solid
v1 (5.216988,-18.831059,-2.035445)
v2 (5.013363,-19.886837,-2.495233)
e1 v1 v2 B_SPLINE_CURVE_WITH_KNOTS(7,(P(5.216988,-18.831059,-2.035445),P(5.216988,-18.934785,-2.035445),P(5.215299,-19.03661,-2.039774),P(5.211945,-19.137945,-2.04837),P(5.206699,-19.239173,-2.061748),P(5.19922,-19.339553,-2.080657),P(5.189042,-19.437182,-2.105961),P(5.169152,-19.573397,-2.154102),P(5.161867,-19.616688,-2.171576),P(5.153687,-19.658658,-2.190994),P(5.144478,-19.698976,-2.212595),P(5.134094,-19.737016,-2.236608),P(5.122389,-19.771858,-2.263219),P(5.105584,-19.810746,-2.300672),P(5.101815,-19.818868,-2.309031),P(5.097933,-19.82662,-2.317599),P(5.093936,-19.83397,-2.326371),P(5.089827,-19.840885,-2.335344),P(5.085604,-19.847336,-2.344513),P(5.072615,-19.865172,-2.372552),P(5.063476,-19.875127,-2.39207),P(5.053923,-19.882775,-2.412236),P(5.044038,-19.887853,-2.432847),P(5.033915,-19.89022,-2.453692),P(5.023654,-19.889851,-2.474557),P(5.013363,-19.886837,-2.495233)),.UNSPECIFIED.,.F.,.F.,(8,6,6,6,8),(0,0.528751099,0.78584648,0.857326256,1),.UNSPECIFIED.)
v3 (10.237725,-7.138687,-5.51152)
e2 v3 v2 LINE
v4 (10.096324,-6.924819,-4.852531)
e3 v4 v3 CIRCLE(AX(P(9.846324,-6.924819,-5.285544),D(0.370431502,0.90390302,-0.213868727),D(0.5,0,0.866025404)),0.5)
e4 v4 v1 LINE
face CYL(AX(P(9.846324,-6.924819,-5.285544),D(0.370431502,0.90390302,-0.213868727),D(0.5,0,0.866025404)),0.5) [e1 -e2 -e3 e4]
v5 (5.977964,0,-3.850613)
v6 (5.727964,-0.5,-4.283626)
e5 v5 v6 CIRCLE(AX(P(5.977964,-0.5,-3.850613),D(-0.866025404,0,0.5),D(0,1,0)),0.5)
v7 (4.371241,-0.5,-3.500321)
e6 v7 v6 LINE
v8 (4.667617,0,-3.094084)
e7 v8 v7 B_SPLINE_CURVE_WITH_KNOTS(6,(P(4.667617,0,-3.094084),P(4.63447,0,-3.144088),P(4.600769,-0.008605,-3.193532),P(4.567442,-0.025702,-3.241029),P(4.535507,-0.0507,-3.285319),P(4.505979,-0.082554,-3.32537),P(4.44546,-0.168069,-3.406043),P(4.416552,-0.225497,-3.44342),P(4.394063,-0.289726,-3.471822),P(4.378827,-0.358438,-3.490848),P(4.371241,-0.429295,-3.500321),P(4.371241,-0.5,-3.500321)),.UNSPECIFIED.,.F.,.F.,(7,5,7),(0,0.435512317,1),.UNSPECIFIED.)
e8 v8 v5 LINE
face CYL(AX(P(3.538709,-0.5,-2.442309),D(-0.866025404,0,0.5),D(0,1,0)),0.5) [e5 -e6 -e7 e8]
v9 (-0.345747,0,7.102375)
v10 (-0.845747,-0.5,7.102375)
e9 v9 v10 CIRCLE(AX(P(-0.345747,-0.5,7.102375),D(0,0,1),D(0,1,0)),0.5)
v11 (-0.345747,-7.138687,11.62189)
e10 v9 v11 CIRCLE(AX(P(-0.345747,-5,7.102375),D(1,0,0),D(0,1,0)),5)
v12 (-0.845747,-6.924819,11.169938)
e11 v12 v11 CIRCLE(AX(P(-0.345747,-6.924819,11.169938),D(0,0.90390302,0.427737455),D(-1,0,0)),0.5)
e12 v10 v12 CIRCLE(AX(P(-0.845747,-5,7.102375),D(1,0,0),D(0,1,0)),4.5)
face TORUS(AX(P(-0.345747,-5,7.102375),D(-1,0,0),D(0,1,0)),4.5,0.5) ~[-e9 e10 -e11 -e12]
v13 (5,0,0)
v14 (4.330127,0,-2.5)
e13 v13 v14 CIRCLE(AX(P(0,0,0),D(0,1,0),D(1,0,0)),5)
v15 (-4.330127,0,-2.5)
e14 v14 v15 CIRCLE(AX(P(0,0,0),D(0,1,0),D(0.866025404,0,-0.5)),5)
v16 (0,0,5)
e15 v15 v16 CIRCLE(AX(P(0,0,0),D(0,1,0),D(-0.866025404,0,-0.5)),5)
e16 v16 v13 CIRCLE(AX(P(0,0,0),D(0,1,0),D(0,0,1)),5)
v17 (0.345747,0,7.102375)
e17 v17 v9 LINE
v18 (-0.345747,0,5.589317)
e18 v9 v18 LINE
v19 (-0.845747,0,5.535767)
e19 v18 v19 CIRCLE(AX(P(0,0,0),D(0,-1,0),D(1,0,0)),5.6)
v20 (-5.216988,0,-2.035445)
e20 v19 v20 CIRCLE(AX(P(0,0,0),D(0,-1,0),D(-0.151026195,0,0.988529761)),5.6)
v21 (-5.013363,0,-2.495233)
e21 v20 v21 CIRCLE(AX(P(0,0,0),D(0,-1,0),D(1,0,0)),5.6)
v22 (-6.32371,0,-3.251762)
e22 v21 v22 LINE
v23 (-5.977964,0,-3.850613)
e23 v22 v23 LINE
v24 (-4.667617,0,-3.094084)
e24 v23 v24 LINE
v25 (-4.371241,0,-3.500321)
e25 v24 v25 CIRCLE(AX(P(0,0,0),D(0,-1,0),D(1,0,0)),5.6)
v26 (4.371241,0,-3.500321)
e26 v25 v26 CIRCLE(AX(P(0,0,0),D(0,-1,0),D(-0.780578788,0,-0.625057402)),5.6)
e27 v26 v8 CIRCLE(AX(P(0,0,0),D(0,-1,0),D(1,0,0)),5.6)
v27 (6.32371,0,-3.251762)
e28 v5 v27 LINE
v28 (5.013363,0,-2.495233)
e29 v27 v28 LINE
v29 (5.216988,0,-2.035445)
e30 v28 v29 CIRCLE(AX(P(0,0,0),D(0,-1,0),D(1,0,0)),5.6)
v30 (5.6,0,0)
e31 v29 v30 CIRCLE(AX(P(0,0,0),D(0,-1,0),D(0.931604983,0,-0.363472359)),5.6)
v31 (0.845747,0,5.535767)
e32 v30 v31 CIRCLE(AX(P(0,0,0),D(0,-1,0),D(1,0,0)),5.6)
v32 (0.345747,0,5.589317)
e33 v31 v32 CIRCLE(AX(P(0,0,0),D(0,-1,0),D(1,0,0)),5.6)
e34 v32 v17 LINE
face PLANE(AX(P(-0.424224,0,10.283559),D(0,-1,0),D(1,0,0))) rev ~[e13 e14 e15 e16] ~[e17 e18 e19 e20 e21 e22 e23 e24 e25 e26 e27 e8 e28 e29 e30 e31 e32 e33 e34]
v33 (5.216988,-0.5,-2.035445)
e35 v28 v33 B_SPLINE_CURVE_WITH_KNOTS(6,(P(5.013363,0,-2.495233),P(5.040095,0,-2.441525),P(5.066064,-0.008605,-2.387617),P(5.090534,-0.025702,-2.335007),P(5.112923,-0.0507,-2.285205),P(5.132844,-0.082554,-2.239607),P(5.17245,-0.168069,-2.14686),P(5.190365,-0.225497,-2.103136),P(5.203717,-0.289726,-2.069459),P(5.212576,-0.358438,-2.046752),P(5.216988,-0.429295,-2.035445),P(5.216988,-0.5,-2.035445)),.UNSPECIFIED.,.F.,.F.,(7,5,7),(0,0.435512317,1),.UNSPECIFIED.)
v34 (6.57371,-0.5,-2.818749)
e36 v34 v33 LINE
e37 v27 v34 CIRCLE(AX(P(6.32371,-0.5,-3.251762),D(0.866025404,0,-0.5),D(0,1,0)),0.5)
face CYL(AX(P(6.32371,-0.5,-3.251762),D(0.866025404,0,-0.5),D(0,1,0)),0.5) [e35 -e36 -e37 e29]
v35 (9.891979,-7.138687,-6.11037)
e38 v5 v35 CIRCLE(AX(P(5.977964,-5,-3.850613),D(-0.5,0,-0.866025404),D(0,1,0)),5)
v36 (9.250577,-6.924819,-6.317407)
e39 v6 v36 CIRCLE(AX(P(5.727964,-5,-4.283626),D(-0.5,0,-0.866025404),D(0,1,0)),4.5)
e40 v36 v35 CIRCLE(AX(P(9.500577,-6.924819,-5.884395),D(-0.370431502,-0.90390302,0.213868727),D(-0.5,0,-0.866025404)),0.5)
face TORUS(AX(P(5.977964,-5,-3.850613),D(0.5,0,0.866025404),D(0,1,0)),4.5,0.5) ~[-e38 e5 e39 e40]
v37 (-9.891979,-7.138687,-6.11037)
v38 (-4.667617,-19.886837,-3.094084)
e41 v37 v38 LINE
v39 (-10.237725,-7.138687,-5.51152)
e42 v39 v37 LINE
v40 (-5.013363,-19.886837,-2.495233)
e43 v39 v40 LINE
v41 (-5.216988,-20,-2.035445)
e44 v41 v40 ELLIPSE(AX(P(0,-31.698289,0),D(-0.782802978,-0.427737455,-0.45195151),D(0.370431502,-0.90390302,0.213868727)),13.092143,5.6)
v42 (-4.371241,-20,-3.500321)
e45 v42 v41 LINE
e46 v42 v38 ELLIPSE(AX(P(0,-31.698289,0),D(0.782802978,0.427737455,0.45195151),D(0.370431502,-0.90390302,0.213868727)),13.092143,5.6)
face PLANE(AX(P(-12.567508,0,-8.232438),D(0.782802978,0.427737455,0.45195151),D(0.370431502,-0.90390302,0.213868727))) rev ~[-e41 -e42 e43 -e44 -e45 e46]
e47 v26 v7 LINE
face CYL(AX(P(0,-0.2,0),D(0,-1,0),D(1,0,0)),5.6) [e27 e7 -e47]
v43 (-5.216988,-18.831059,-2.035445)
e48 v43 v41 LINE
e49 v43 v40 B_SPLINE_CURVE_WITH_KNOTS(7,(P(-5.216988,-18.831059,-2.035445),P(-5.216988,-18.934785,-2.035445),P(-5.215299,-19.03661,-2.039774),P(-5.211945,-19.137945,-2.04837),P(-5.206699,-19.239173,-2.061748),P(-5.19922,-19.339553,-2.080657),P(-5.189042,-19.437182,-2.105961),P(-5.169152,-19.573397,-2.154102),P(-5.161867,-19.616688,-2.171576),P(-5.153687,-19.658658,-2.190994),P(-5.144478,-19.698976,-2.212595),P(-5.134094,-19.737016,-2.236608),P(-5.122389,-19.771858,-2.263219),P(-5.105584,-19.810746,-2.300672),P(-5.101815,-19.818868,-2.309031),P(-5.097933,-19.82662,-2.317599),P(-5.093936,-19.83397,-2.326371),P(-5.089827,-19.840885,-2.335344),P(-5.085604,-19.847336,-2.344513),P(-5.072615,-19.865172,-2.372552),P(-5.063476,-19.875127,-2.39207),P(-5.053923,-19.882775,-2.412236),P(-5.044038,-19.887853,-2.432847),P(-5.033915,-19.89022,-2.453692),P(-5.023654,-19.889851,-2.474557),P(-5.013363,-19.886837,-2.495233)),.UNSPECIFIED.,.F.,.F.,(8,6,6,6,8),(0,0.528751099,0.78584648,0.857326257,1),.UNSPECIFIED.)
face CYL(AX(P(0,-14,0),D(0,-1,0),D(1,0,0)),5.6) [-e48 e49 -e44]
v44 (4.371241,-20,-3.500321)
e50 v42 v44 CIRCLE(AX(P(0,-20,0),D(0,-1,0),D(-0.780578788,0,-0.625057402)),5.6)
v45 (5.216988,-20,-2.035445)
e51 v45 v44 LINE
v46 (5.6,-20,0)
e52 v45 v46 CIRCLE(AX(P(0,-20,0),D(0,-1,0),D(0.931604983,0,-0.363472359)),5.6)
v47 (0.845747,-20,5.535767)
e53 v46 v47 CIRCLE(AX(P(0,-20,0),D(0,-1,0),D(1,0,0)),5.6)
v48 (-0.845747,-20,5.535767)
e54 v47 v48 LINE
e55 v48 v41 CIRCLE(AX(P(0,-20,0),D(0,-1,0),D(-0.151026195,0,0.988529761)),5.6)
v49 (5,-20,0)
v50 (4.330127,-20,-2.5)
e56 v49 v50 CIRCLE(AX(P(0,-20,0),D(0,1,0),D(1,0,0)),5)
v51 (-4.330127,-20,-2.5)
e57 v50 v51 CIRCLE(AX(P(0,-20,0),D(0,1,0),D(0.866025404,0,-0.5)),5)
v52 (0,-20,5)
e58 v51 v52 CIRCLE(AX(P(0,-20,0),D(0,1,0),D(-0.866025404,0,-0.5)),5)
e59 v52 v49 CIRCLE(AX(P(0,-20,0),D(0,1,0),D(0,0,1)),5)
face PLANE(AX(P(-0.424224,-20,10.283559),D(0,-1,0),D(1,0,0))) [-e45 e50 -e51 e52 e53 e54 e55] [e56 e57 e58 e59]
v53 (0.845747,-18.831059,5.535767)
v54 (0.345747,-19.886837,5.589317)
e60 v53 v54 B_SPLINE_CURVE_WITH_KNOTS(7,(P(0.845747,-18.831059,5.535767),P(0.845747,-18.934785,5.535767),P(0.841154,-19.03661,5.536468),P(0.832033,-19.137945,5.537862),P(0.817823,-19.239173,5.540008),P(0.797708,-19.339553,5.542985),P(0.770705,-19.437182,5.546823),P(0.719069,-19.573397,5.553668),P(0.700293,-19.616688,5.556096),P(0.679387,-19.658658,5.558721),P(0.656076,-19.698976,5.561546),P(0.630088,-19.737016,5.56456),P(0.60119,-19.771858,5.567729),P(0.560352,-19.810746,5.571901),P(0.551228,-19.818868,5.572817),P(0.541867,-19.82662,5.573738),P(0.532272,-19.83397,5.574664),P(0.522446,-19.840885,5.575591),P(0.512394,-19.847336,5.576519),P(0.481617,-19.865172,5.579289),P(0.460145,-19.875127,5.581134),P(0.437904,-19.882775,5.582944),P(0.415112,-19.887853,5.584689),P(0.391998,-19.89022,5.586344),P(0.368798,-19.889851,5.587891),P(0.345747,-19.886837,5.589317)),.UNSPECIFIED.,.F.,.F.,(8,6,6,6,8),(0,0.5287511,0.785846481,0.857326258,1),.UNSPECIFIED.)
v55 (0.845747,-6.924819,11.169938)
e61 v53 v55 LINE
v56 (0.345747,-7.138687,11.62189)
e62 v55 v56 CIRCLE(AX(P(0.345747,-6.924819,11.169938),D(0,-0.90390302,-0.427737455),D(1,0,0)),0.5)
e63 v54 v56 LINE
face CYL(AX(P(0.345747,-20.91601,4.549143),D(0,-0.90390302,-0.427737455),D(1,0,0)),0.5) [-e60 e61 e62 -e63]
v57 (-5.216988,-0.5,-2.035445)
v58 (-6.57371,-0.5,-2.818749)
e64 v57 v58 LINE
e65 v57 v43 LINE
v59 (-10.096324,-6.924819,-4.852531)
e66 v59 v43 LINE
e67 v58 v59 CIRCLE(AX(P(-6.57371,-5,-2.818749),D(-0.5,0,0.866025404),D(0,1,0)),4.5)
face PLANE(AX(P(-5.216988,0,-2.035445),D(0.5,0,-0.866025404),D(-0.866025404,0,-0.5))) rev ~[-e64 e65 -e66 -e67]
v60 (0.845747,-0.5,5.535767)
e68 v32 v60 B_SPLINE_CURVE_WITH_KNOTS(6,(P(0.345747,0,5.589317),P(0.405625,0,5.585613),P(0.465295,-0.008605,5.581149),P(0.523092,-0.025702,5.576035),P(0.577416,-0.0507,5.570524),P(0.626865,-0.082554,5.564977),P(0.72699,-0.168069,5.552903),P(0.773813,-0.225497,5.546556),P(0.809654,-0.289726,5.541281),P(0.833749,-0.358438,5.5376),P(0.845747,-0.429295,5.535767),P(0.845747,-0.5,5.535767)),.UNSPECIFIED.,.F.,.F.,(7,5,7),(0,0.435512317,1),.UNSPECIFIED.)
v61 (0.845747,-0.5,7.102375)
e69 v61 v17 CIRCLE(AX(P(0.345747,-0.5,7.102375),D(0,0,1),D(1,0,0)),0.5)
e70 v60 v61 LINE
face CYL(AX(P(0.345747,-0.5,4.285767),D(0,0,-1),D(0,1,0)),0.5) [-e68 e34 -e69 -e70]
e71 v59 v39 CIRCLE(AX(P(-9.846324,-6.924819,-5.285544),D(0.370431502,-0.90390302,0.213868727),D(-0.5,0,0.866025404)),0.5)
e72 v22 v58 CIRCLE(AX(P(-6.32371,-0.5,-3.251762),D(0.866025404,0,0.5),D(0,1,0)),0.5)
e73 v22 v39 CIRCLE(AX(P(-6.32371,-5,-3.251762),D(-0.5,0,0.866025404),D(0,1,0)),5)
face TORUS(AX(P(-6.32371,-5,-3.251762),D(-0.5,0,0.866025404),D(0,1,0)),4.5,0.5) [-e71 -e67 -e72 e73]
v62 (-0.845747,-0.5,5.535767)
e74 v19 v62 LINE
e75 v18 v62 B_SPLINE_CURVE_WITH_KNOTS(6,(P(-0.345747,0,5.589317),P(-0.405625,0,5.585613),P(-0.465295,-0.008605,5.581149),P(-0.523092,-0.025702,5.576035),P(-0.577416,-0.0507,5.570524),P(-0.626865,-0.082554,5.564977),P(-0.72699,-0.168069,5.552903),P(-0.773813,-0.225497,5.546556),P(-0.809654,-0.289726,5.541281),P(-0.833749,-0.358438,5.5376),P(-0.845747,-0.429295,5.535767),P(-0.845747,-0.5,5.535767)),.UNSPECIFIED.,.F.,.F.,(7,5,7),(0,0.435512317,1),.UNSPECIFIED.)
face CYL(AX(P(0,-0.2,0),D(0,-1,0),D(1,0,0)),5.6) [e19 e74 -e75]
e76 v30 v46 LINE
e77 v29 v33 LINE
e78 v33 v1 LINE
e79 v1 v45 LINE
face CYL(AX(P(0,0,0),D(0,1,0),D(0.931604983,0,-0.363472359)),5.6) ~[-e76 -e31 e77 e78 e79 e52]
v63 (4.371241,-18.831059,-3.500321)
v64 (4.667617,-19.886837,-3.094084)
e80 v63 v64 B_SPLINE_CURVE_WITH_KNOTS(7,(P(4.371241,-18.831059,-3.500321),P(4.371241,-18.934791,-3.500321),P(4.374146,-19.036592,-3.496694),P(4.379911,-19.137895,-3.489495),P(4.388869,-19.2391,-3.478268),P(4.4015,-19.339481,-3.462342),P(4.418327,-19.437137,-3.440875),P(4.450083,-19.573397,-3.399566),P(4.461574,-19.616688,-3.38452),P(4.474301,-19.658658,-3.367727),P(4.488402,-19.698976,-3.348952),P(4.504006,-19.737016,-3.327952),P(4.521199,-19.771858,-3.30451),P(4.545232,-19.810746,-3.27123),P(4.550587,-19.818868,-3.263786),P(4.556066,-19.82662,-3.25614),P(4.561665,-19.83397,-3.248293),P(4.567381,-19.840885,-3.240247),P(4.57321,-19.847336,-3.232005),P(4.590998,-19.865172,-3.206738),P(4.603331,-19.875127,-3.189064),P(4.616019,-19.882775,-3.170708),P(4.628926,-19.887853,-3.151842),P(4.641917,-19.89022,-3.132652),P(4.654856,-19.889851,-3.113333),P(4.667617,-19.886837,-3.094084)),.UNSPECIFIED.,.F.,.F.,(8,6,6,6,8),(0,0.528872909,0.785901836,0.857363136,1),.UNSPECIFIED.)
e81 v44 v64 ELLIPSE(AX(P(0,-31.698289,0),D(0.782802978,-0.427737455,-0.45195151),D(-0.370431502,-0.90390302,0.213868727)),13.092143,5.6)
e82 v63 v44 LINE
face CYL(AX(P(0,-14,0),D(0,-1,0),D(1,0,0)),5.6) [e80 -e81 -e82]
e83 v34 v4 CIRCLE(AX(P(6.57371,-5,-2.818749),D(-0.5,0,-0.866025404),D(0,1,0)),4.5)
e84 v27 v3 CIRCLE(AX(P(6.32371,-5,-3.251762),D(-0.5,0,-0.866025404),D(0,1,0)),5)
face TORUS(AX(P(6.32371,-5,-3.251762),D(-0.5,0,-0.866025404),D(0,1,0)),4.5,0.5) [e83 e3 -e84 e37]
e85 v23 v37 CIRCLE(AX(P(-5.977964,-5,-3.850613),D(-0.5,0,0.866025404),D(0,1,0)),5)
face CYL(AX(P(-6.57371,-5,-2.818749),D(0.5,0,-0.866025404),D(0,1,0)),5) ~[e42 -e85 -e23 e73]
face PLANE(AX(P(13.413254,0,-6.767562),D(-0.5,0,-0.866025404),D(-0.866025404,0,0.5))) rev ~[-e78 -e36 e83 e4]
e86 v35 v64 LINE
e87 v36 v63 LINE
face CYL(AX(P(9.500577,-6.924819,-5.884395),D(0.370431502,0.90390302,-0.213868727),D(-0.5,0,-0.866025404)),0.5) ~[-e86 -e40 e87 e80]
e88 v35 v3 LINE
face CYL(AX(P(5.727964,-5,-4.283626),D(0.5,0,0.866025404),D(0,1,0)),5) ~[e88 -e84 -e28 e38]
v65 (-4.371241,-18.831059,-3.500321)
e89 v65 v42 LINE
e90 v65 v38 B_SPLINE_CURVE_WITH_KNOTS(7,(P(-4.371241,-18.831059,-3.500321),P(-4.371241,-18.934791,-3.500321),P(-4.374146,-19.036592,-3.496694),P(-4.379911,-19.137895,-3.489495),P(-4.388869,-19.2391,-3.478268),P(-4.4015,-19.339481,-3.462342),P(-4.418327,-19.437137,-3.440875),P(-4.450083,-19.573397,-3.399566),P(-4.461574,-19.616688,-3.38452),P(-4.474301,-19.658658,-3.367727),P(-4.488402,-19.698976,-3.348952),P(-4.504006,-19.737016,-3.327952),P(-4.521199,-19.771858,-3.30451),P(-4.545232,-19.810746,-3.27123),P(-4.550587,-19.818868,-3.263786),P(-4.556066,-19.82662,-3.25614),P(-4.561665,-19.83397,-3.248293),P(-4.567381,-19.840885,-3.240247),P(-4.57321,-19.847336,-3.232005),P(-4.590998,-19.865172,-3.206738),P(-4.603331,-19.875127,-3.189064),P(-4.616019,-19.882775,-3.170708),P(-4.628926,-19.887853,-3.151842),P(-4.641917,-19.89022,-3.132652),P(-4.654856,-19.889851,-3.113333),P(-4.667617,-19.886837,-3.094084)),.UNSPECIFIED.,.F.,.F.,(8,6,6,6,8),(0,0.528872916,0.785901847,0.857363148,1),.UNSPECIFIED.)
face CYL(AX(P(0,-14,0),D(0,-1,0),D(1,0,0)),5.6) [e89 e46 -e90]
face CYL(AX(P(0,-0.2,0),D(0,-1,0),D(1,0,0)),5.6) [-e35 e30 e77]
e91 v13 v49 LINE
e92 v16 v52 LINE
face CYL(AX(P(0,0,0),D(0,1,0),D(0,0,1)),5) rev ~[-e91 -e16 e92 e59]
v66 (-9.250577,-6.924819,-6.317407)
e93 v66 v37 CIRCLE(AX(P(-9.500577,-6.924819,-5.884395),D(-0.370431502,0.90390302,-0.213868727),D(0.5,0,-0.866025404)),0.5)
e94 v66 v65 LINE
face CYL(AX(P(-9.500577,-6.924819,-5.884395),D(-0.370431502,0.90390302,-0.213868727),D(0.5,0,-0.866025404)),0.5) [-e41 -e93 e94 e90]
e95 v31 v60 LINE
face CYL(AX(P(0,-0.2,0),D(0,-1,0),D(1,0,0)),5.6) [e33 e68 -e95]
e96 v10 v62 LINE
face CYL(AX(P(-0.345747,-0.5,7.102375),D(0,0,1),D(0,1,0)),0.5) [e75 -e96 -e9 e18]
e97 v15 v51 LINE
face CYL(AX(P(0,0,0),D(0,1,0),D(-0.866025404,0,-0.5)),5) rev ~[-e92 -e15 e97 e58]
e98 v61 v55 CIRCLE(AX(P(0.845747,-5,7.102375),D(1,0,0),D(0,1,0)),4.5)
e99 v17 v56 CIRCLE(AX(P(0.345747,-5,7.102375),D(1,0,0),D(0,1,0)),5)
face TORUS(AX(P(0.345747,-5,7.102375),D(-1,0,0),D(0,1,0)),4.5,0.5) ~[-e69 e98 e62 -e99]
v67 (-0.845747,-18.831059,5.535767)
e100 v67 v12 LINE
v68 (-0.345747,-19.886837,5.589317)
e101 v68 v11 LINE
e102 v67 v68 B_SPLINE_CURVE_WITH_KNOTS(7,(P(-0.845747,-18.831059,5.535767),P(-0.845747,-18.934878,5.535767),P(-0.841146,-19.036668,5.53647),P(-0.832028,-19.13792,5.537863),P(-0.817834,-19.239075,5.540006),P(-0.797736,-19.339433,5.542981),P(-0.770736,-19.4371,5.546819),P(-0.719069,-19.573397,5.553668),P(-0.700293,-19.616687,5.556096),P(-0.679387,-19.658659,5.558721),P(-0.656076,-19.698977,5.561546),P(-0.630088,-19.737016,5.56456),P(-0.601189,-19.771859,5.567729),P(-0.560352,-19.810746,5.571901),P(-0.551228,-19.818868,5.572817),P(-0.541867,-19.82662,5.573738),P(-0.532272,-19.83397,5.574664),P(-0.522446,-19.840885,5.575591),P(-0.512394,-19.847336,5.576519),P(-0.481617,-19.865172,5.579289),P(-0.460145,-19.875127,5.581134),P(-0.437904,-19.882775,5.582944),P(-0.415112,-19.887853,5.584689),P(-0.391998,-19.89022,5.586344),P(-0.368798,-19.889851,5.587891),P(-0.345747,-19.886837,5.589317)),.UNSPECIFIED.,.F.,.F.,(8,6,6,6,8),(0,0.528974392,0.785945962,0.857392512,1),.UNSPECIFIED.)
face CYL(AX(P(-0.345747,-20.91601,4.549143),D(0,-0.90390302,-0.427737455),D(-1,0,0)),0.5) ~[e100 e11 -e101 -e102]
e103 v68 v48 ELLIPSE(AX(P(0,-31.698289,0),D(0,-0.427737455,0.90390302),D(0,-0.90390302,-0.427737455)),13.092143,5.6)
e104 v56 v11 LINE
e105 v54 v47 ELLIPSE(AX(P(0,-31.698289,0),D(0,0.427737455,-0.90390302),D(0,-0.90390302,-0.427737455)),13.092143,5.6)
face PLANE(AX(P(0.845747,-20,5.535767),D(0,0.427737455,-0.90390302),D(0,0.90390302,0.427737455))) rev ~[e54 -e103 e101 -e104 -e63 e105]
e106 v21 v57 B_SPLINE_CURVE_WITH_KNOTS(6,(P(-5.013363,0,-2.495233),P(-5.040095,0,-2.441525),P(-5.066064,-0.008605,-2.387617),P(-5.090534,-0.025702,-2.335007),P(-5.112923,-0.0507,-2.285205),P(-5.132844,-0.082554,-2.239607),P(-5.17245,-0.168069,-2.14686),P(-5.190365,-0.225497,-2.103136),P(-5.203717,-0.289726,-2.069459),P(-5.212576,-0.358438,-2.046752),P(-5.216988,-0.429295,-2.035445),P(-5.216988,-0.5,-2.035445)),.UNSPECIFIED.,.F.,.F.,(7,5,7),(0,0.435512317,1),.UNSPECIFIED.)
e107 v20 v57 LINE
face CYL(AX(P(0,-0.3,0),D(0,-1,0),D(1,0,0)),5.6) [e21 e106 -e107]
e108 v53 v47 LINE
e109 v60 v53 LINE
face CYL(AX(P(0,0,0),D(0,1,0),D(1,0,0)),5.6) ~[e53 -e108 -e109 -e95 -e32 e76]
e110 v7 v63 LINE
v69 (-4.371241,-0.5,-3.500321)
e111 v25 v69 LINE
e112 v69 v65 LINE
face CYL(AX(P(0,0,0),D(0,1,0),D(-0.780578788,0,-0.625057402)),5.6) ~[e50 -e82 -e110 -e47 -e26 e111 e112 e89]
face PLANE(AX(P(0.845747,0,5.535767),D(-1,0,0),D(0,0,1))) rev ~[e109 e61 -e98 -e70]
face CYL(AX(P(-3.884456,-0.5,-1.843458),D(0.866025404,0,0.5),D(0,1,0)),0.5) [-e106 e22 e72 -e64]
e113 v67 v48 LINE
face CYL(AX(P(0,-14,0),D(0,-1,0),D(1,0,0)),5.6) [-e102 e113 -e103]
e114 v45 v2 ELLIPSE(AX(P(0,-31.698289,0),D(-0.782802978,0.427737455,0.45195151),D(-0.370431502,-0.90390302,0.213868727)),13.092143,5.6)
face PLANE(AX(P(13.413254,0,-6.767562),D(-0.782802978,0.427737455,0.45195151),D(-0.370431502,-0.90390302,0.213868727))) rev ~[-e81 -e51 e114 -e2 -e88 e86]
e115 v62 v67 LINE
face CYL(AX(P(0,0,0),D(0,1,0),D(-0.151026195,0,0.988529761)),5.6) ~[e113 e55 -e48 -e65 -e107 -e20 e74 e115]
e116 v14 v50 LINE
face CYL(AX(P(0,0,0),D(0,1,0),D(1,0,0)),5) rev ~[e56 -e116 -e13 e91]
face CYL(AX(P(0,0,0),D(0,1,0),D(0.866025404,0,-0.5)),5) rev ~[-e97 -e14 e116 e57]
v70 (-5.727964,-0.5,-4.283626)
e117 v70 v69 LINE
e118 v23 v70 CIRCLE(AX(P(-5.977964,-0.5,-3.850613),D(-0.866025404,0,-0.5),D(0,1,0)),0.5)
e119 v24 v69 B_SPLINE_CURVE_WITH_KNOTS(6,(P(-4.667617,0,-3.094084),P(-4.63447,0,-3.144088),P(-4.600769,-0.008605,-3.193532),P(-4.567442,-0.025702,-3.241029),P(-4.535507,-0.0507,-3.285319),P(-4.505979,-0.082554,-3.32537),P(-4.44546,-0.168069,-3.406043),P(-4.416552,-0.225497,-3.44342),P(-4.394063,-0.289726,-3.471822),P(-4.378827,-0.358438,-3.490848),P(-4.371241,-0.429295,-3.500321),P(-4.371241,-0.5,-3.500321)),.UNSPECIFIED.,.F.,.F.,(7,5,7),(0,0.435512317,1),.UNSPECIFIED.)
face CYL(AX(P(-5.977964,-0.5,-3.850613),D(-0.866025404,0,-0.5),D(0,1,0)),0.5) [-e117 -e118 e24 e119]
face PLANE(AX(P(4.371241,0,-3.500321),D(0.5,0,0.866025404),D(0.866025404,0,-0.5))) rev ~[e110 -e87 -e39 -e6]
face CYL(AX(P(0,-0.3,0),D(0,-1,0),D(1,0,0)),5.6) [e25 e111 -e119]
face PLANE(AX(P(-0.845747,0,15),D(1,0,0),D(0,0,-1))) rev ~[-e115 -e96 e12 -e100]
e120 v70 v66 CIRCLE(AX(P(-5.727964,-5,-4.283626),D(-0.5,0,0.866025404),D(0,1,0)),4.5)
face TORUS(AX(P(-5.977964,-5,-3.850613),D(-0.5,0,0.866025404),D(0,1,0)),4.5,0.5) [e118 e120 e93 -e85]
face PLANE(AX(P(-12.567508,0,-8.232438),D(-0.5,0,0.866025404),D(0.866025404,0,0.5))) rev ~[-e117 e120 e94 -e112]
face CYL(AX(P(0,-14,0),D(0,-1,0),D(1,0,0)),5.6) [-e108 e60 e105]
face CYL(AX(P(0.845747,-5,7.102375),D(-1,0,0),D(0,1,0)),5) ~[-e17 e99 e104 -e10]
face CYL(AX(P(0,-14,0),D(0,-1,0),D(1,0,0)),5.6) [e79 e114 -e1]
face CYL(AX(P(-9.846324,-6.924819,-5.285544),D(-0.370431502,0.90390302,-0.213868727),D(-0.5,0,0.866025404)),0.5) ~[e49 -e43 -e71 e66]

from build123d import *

# Parameters (mm, degrees)
F1_DEPTH      = 20
F2_DEPTH      = 20
F4_DEPTH      = 14.8
F5_R          = 5
F6_DEPTH      = 20
F8_DEPTH      = 25
F10_DEPTH     = 25
F11_R         = 5
F12_T4_DEPTH  = 15.4786422769
F12_S5_R      = 5.6
F12_T6_DEPTH  = 9
F12_T10_DEPTH = 15.4786422769
F12_S11_R     = 5.6
F12_T12_DEPTH = 9
F12_T14_ANGLE = 115.3240588084
F12_T16_ANGLE = 115.3240588084
F12_T20_DEPTH = 2.8166081333
F12_S21_R     = 5.6
F12_T22_DEPTH = 3
F12_T26_DEPTH = 2.8166081333
F12_S27_R     = 5.6
F12_T28_DEPTH = 3
F13_T4_DEPTH  = 15.4786422769
F13_S5_R      = 5.6
F13_T6_DEPTH  = 9
F13_T10_DEPTH = 15.4786422769
F13_S11_R     = 5.6
F13_T12_DEPTH = 10
F13_T16_DEPTH = 15.4786422769
F13_S17_R     = 5.6
F13_T18_DEPTH = 10
F13_T22_DEPTH = 15.4786422769
F13_S23_R     = 5.6
F13_T24_DEPTH = 9
F13_T28_DEPTH = 2.8166081333
F13_S29_R     = 5.6
F13_T30_DEPTH = 3
F13_T34_DEPTH = 2.8166081333
F13_S35_R     = 5.6
F13_T36_DEPTH = 3
F13_T40_DEPTH = 2.8166081333
F13_S41_R     = 5.6
F13_T42_DEPTH = 3
F13_T46_DEPTH = 2.8166081333
F13_S47_R     = 5.6
F13_T48_DEPTH = 3
F13_T50_ANGLE = 115.3240588084
F13_T52_ANGLE = 115.3240588084
F13_T54_ANGLE = 115.3240588084
F13_T56_ANGLE = 115.3240588084


# Not quite as in the source:
# - a fillet or chamfer that OpenCascade refuses, or shapes differently, is made with other operations: its cross-section is extruded or revolved along the edge and cut away or added


with BuildPart() as f1:
    # F0 (on Front) → F1 (new body)
    with BuildSketch(Plane.XZ):
        with BuildLine():
            ThreePointArc((-4.3301270189, -2.5), (-4.3301270189, 2.5), (0, 5))
            Line((0, 5), (-0.8457466924, 5))
            Line((-0.8457466924, 5), (-0.8457466924, 5.5357666617))
            ThreePointArc((-0.8457466924, 5.5357666617), (-4.8497422612, 2.8), (-5.2169879046, -2.03544521))
            Line((-5.2169879046, -2.03544521), (-4.7530003651, -1.7675618792))
            Line((-4.7530003651, -1.7675618792), (-4.3301270189, -2.5))
        make_face()
        with BuildLine():
            Line((3.9072536727, -3.2324381208), (4.3301270189, -2.5))
            ThreePointArc((4.3301270189, -2.5), (0, -5), (-4.3301270189, -2.5))
            Line((-4.3301270189, -2.5), (-3.9072536727, -3.2324381208))
            Line((-3.9072536727, -3.2324381208), (-4.3712412122, -3.5003214516))
            ThreePointArc((-4.3712412122, -3.5003214516), (0, -5.6), (4.3712412122, -3.5003214516))
            Line((4.3712412122, -3.5003214516), (3.9072536727, -3.2324381208))
        make_face()
        with BuildLine():
            Line((-3.9072536727, -3.2324381208), (-4.3301270189, -2.5))
            Line((-4.3301270189, -2.5), (-4.8497422612, -2.8))
            ThreePointArc((-4.8497422612, -2.8), (-4.6237697378, -3.1592330417), (-4.3712412122, -3.5003214516))
            Line((-4.3712412122, -3.5003214516), (-3.9072536727, -3.2324381208))
        make_face()
        with BuildLine():
            Line((-4.8497422612, -2.8), (-4.3301270189, -2.5))
            Line((-4.3301270189, -2.5), (-4.7530003651, -1.7675618792))
            Line((-4.7530003651, -1.7675618792), (-5.2169879046, -2.03544521))
            ThreePointArc((-5.2169879046, -2.03544521), (-5.0478609395, -2.4246855333), (-4.8497422612, -2.8))
        make_face()
        with BuildLine():
            Line((4.8497422612, -2.8), (4.3301270189, -2.5))
            Line((4.3301270189, -2.5), (3.9072536727, -3.2324381208))
            Line((3.9072536727, -3.2324381208), (4.3712412122, -3.5003214516))
            ThreePointArc((4.3712412122, -3.5003214516), (4.6237697378, -3.1592330417), (4.8497422612, -2.8))
        make_face()
        with BuildLine():
            Line((4.7530003651, -1.7675618792), (4.3301270189, -2.5))
            Line((4.3301270189, -2.5), (4.8497422612, -2.8))
            ThreePointArc((4.8497422612, -2.8), (5.0478609395, -2.4246855333), (5.2169879046, -2.03544521))
            Line((5.2169879046, -2.03544521), (4.7530003651, -1.7675618792))
        make_face()
        with BuildLine():
            ThreePointArc((0, 5), (3.5355339059, 3.5355339059), (5, 0))
            ThreePointArc((5, 0), (4.8296291314, -1.2940952255), (4.3301270189, -2.5))
            Line((4.3301270189, -2.5), (4.7530003651, -1.7675618792))
            Line((4.7530003651, -1.7675618792), (5.2169879046, -2.03544521))
            ThreePointArc((5.2169879046, -2.03544521), (5.5034140434, -1.0355838291), (5.6, 0))
            ThreePointArc((5.6, 0), (4.2483044546, 3.6485489254), (0.8457466924, 5.5357666617))
            Line((0.8457466924, 5.5357666617), (0.8457466924, 5))
            Line((0.8457466924, 5), (0, 5))
        make_face()
        with BuildLine():
            Line((0, 5.6), (0, 5))
            Line((0, 5), (0.8457466924, 5))
            Line((0.8457466924, 5), (0.8457466924, 5.5357666617))
            ThreePointArc((0.8457466924, 5.5357666617), (0.4240912017, 5.583918575), (0, 5.6))
        make_face()
        with BuildLine():
            Line((-0.8457466924, 5), (0, 5))
            Line((0, 5), (0, 5.6))
            ThreePointArc((0, 5.6), (-0.4240912017, 5.583918575), (-0.8457466924, 5.5357666617))
            Line((-0.8457466924, 5.5357666617), (-0.8457466924, 5))
        make_face()
    extrude(amount=F1_DEPTH)

    # F0 (on Front) → F2 (join)
    with BuildSketch(Plane.XZ):
        with BuildLine():
            ThreePointArc((-4.3712412122, -3.5003214516), (-4.6237697378, -3.1592330417), (-4.8497422612, -2.8))
            Line((-4.8497422612, -2.8), (-12.9903810568, -7.5))
            Line((-12.9903810568, -7.5), (-12.5675077106, -8.2324381208))
            Line((-12.5675077106, -8.2324381208), (-4.3712412122, -3.5003214516))
        make_face()
        with BuildLine():
            Line((-12.9903810568, -7.5), (-4.8497422612, -2.8))
            ThreePointArc((-4.8497422612, -2.8), (-5.0478609395, -2.4246855333), (-5.2169879046, -2.03544521))
            Line((-5.2169879046, -2.03544521), (-13.413254403, -6.7675618792))
            Line((-13.413254403, -6.7675618792), (-12.9903810568, -7.5))
        make_face()
    extrude(amount=F2_DEPTH)

    # F3 (on face) → F4 (cut)
    with BuildSketch(Plane(origin=(0.4228733462, 0, -0.7324381208), x_dir=(0.8660254038, 0, 0.5), z_dir=(0.5, 0, -0.8660254038))):
        Polygon((-15, 0), (-5.5357666617, 20), (-15, 20), align=None)
    extrude(amount=-F4_DEPTH, mode=Mode.SUBTRACT)

    # F5
    f5_edges = [f1.edges().sort_by_distance(p)[0] for p in [
        (-12.990381, 0, -7.5),
    ]]
    fillet(f5_edges, radius=F5_R)

    # F0 (on Front) → F6 (join)
    with BuildSketch(Plane.XZ):
        with BuildLine():
            ThreePointArc((-0.8457466924, 5.5357666617), (-0.4240912017, 5.583918575), (0, 5.6))
            Line((0, 5.6), (0, 15))
            Line((0, 15), (-0.8457466924, 15))
            Line((-0.8457466924, 15), (-0.8457466924, 5.5357666617))
        make_face()
        with BuildLine():
            Line((0, 15), (0, 5.6))
            ThreePointArc((0, 5.6), (0.4240912017, 5.583918575), (0.8457466924, 5.5357666617))
            Line((0.8457466924, 5.5357666617), (0.8457466924, 15))
            Line((0.8457466924, 15), (0, 15))
        make_face()
        with BuildLine():
            ThreePointArc((5.2169879046, -2.03544521), (5.0478609395, -2.4246855333), (4.8497422612, -2.8))
            Line((4.8497422612, -2.8), (12.9903810568, -7.5))
            Line((12.9903810568, -7.5), (13.413254403, -6.7675618792))
            Line((13.413254403, -6.7675618792), (5.2169879046, -2.03544521))
        make_face()
        with BuildLine():
            Line((12.9903810568, -7.5), (4.8497422612, -2.8))
            ThreePointArc((4.8497422612, -2.8), (4.6237697378, -3.1592330417), (4.3712412122, -3.5003214516))
            Line((4.3712412122, -3.5003214516), (12.5675077106, -8.2324381208))
            Line((12.5675077106, -8.2324381208), (12.9903810568, -7.5))
        make_face()
    extrude(amount=F6_DEPTH)

    # F7 (on face) → F8 (cut)
    with BuildSketch(Plane(origin=(0.4228733462, 0, 0.7324381208), x_dir=(0.8660254038, 0, -0.5), z_dir=(0.5, 0, 0.8660254038))):
        Polygon((15, 0), (5.5357666617, -20), (15, -20), align=None)
    extrude(amount=-F8_DEPTH, mode=Mode.SUBTRACT)

    # F9 (on face) → F10 (cut)
    with BuildSketch(Plane.YZ.offset(0.8457466924)):
        Polygon((-20, 15), (-20, 5.5357666617), (0, 15), align=None)
    extrude(amount=-F10_DEPTH, mode=Mode.SUBTRACT)

    # F11
    f11_edges = [f1.edges().sort_by_distance(p)[0] for p in [
        (12.990381, 0, -7.5),
        (0, 0, 15),
    ]]
    fillet(f11_edges, radius=F11_R)

    # F12: fillet of radius 0.5 on 4 edges, made by hand


with BuildPart() as f12_tool2:
    # F12_s3 → F12_t4 (new body)
    with BuildSketch(Plane(origin=(0, -15.3303811163, -7.2545152025), x_dir=(1, 0, 0), z_dir=(0, 0.9039030201, 0.4277374549))):
        with BuildLine():
            ThreePointArc((0.8457466924, -13.0585453012), (0.699300083, -13.4120986918), (0.3457466924, -13.5585453012))
            Line((0.3457466924, -13.5585453012), (0.8457466924, -13.5585453012))
            Line((0.8457466924, -13.5585453012), (0.8457466924, -13.0585453012))
        make_face()
    extrude(amount=F12_T4_DEPTH)

    # F12_s5 → F12_t6 (cut, symmetric)
    with BuildSketch(Plane.XZ.offset(14)):
        Circle(F12_S5_R)
    extrude(amount=F12_T6_DEPTH, both=True, mode=Mode.SUBTRACT)


with BuildPart() as f1_1:
    add(f1.part)

    # F12_t1: cut F12_tool2
    add(f12_tool2.part, mode=Mode.SUBTRACT)


with BuildPart() as f12_tool8:
    # F12_s9 → F12_t10 (new body)
    with BuildSketch(Plane(origin=(0, -15.3303811163, -7.2545152025), x_dir=(1, 0, 0), z_dir=(0, 0.9039030201, 0.4277374549))):
        with BuildLine():
            ThreePointArc((-0.8457466924, -13.0585453012), (-0.699300083, -13.4120986918), (-0.3457466924, -13.5585453012))
            Line((-0.3457466924, -13.5585453012), (-0.8457466924, -13.5585453012))
            Line((-0.8457466924, -13.5585453012), (-0.8457466924, -13.0585453012))
        make_face()
    extrude(amount=F12_T10_DEPTH)

    # F12_s11 → F12_t12 (cut, symmetric)
    with BuildSketch(Plane.XZ.offset(14)):
        Circle(F12_S11_R)
    extrude(amount=F12_T12_DEPTH, both=True, mode=Mode.SUBTRACT)


with BuildPart() as f1_2:
    add(f1_1.part)

    # F12_t7: cut F12_tool8
    add(f12_tool8.part, mode=Mode.SUBTRACT)

    # F12_s13 → F12_t14 (revolve, cut)
    with BuildSketch(Plane.XY.offset(7.1023747949)):
        with BuildLine():
            ThreePointArc((0.8457466924, -0.5), (0.699300083, -0.1464466094), (0.3457466924, 0))
            Line((0.3457466924, 0), (0.8457466924, 0))
            Line((0.8457466924, 0), (0.8457466924, -0.5))
        make_face()
    revolve(axis=Axis((0.8457466924, -5, 7.1023747949), (1, 0, 0)), revolution_arc=F12_T14_ANGLE, mode=Mode.SUBTRACT)

    # F12_s15 → F12_t16 (revolve, cut)
    with BuildSketch(Plane.XY.offset(7.1023747949)):
        with BuildLine():
            ThreePointArc((-0.3457466924, 0), (-0.699300083, -0.1464466094), (-0.8457466924, -0.5))
            Line((-0.8457466924, -0.5), (-0.8457466924, 0))
            Line((-0.8457466924, 0), (-0.3457466924, 0))
        make_face()
    revolve(axis=Axis((-0.8457466924, -5, 7.1023747949), (1, 0, 0)), revolution_arc=F12_T16_ANGLE, mode=Mode.SUBTRACT)


with BuildPart() as f12_tool18:
    # F12_s19 → F12_t20 (new body)
    with BuildSketch(Plane.XY.offset(7.1023747949)):
        with BuildLine():
            ThreePointArc((-0.3457466924, 0), (-0.699300083, -0.1464466094), (-0.8457466924, -0.5))
            Line((-0.8457466924, -0.5), (-0.8457466924, 0))
            Line((-0.8457466924, 0), (-0.3457466924, 0))
        make_face()
    extrude(amount=-F12_T20_DEPTH)

    # F12_s21 → F12_t22 (cut, symmetric)
    with BuildSketch(Plane.XZ.offset(0.2)):
        Circle(F12_S21_R)
    extrude(amount=F12_T22_DEPTH, both=True, mode=Mode.SUBTRACT)


with BuildPart() as f1_3:
    add(f1_2.part)

    # F12_t17: cut F12_tool18
    add(f12_tool18.part, mode=Mode.SUBTRACT)


with BuildPart() as f12_tool24:
    # F12_s25 → F12_t26 (new body)
    with BuildSketch(Plane.XY.offset(4.2857666617)):
        with BuildLine():
            ThreePointArc((0.3457466924, 0), (0.699300083, -0.1464466094), (0.8457466924, -0.5))
            Line((0.8457466924, -0.5), (0.8457466924, 0))
            Line((0.8457466924, 0), (0.3457466924, 0))
        make_face()
    extrude(amount=F12_T26_DEPTH)

    # F12_s27 → F12_t28 (cut, symmetric)
    with BuildSketch(Plane.XZ.offset(0.2)):
        Circle(F12_S27_R)
    extrude(amount=F12_T28_DEPTH, both=True, mode=Mode.SUBTRACT)


with BuildPart() as f1_4:
    add(f1_3.part)

    # F12_t23: cut F12_tool24
    add(f12_tool24.part, mode=Mode.SUBTRACT)

    # F13: fillet of radius 0.5 on 12 edges, made by hand


with BuildPart() as f13_tool2:
    # F13_s3 → F13_t4 (new body)
    with BuildSketch(Plane(origin=(-0.548817749, -1.3391896155, 0.3168600751), x_dir=(0.9253125221, -0.3792054013, 0), z_dir=(-0.3704315021, -0.9039030201, 0.2138687274))):
        with BuildLine():
            ThreePointArc((11.9681833862, -5.2918313734), (12.2138673733, -5.5852355109), (12.1801241312, -5.9664283795))
            Line((12.1801241312, -5.9664283795), (12.4114522618, -5.5231595039))
            Line((12.4114522618, -5.5231595039), (11.9681833862, -5.2918313734))
        make_face()
    extrude(amount=F13_T4_DEPTH)

    # F13_s5 → F13_t6 (cut, symmetric)
    with BuildSketch(Plane.XZ.offset(14)):
        Circle(F13_S5_R)
    extrude(amount=F13_T6_DEPTH, both=True, mode=Mode.SUBTRACT)


with BuildPart() as f1_5:
    add(f1_4.part)

    # F13_t1: cut F13_tool2
    add(f13_tool2.part, mode=Mode.SUBTRACT)


with BuildPart() as f13_tool8:
    # F13_s9 → F13_t10 (new body)
    with BuildSketch(Plane(origin=(-0.548817749, -1.3391896155, 0.3168600751), x_dir=(0.9253125221, -0.3792054013, 0), z_dir=(-0.3704315021, -0.9039030201, 0.2138687274))):
        with BuildLine():
            ThreePointArc((11.1856033812, -6.7914041148), (11.5667962497, -6.8251473568), (11.8602003872, -6.5794633698))
            Line((11.8602003872, -6.5794633698), (11.6288722567, -7.0227322453))
            Line((11.6288722567, -7.0227322453), (11.1856033812, -6.7914041148))
        make_face()
    extrude(amount=F13_T10_DEPTH)

    # F13_s11 → F13_t12 (cut, symmetric)
    with BuildSketch(Plane.XZ.offset(14)):
        Circle(F13_S11_R)
    extrude(amount=F13_T12_DEPTH, both=True, mode=Mode.SUBTRACT)


with BuildPart() as f1_6:
    add(f1_5.part)

    # F13_t7: cut F13_tool8
    add(f13_tool8.part, mode=Mode.SUBTRACT)


with BuildPart() as f13_tool14:
    # F13_s15 → F13_t16 (new body)
    with BuildSketch(Plane(origin=(0.548817749, -1.3391896155, 0.3168600751), x_dir=(0.9253125221, 0.3792054013, 0), z_dir=(0.3704315021, -0.9039030201, 0.2138687274))):
        with BuildLine():
            ThreePointArc((-11.1856033812, -6.7914041148), (-11.5667962497, -6.8251473568), (-11.8602003872, -6.5794633698))
            Line((-11.8602003872, -6.5794633698), (-11.6288722567, -7.0227322453))
            Line((-11.6288722567, -7.0227322453), (-11.1856033812, -6.7914041148))
        make_face()
    extrude(amount=F13_T16_DEPTH)

    # F13_s17 → F13_t18 (cut, symmetric)
    with BuildSketch(Plane.XZ.offset(14)):
        Circle(F13_S17_R)
    extrude(amount=F13_T18_DEPTH, both=True, mode=Mode.SUBTRACT)


with BuildPart() as f1_7:
    add(f1_6.part)

    # F13_t13: cut F13_tool14
    add(f13_tool14.part, mode=Mode.SUBTRACT)


with BuildPart() as f13_tool20:
    # F13_s21 → F13_t22 (new body)
    with BuildSketch(Plane(origin=(0.548817749, -1.3391896155, 0.3168600751), x_dir=(0.9253125221, 0.3792054013, 0), z_dir=(0.3704315021, -0.9039030201, 0.2138687274))):
        with BuildLine():
            ThreePointArc((-11.9681833862, -5.2918313734), (-12.2138673733, -5.5852355109), (-12.1801241312, -5.9664283795))
            Line((-12.1801241312, -5.9664283795), (-12.4114522618, -5.5231595039))
            Line((-12.4114522618, -5.5231595039), (-11.9681833862, -5.2918313734))
        make_face()
    extrude(amount=F13_T22_DEPTH)

    # F13_s23 → F13_t24 (cut, symmetric)
    with BuildSketch(Plane.XZ.offset(14)):
        Circle(F13_S23_R)
    extrude(amount=F13_T24_DEPTH, both=True, mode=Mode.SUBTRACT)


with BuildPart() as f1_8:
    add(f1_7.part)

    # F13_t19: cut F13_tool20
    add(f13_tool20.part, mode=Mode.SUBTRACT)


with BuildPart() as f13_tool26:
    # F13_s27 → F13_t28 (new body)
    with BuildSketch(Plane(origin=(3.7115828037, 0, -2.1428833308), x_dir=(0, 1, 0), z_dir=(0.8660254038, 0, -0.5))):
        with BuildLine():
            ThreePointArc((0, -0.3457466924), (-0.1464466094, -0.699300083), (-0.5, -0.8457466924))
            Line((-0.5, -0.8457466924), (0, -0.8457466924))
            Line((0, -0.8457466924), (0, -0.3457466924))
        make_face()
    extrude(amount=F13_T28_DEPTH)

    # F13_s29 → F13_t30 (cut, symmetric)
    with BuildSketch(Plane.XZ.offset(0.2)):
        Circle(F13_S29_R)
    extrude(amount=F13_T30_DEPTH, both=True, mode=Mode.SUBTRACT)


with BuildPart() as f1_9:
    add(f1_8.part)

    # F13_t25: cut F13_tool26
    add(f13_tool26.part, mode=Mode.SUBTRACT)


with BuildPart() as f13_tool32:
    # F13_s33 → F13_t34 (new body)
    with BuildSketch(Plane(origin=(-6.1508369996, 0, -3.5511873975), x_dir=(0, 1, 0), z_dir=(0.8660254038, 0, 0.5))):
        with BuildLine():
            ThreePointArc((0, -0.3457466924), (-0.1464466094, -0.699300083), (-0.5, -0.8457466924))
            Line((-0.5, -0.8457466924), (0, -0.8457466924))
            Line((0, -0.8457466924), (0, -0.3457466924))
        make_face()
    extrude(amount=F13_T34_DEPTH)

    # F13_s35 → F13_t36 (cut, symmetric)
    with BuildSketch(Plane.XZ.offset(0.3)):
        Circle(F13_S35_R)
    extrude(amount=F13_T36_DEPTH, both=True, mode=Mode.SUBTRACT)


with BuildPart() as f1_10:
    add(f1_9.part)

    # F13_t31: cut F13_tool32
    add(f13_tool32.part, mode=Mode.SUBTRACT)


with BuildPart() as f13_tool38:
    # F13_s39 → F13_t40 (new body)
    with BuildSketch(Plane(origin=(-3.7115828037, 0, -2.1428833308), x_dir=(0, 1, 0), z_dir=(-0.8660254038, 0, -0.5))):
        with BuildLine():
            ThreePointArc((0, -0.3457466924), (-0.1464466094, -0.699300083), (-0.5, -0.8457466924))
            Line((-0.5, -0.8457466924), (0, -0.8457466924))
            Line((0, -0.8457466924), (0, -0.3457466924))
        make_face()
    extrude(amount=F13_T40_DEPTH)

    # F13_s41 → F13_t42 (cut, symmetric)
    with BuildSketch(Plane.XZ.offset(0.3)):
        Circle(F13_S41_R)
    extrude(amount=F13_T42_DEPTH, both=True, mode=Mode.SUBTRACT)


with BuildPart() as f1_11:
    add(f1_10.part)

    # F13_t37: cut F13_tool38
    add(f13_tool38.part, mode=Mode.SUBTRACT)


with BuildPart() as f13_tool44:
    # F13_s45 → F13_t46 (new body)
    with BuildSketch(Plane(origin=(6.1508369996, 0, -3.5511873975), x_dir=(0, 1, 0), z_dir=(-0.8660254038, 0, 0.5))):
        with BuildLine():
            ThreePointArc((0, -0.3457466924), (-0.1464466094, -0.699300083), (-0.5, -0.8457466924))
            Line((-0.5, -0.8457466924), (0, -0.8457466924))
            Line((0, -0.8457466924), (0, -0.3457466924))
        make_face()
    extrude(amount=F13_T46_DEPTH)

    # F13_s47 → F13_t48 (cut, symmetric)
    with BuildSketch(Plane.XZ.offset(0.2)):
        Circle(F13_S47_R)
    extrude(amount=F13_T48_DEPTH, both=True, mode=Mode.SUBTRACT)


with BuildPart() as f1_12:
    add(f1_11.part)

    # F13_t43: cut F13_tool44
    add(f13_tool44.part, mode=Mode.SUBTRACT)

    # F13_s49 → F13_t50 (revolve, cut)
    with BuildSketch(Plane(origin=(6.1508369996, 0, -3.5511873975), x_dir=(0, 1, 0), z_dir=(-0.8660254038, 0, 0.5))):
        with BuildLine():
            ThreePointArc((-0.5, 0.8457466924), (-0.1464466094, 0.699300083), (0, 0.3457466924))
            Line((0, 0.3457466924), (0, 0.8457466924))
            Line((0, 0.8457466924), (-0.5, 0.8457466924))
        make_face()
    revolve(axis=Axis((5.7279636534, -5, -4.2836255183), (-0.5, 0, -0.8660254038)), revolution_arc=F13_T50_ANGLE, mode=Mode.SUBTRACT)

    # F13_s51 → F13_t52 (revolve, cut)
    with BuildSketch(Plane(origin=(-6.1508369996, 0, -3.5511873975), x_dir=(0, 1, 0), z_dir=(0.8660254038, 0, 0.5))):
        with BuildLine():
            ThreePointArc((-0.5, -0.8457466924), (-0.1464466094, -0.699300083), (0, -0.3457466924))
            Line((0, -0.3457466924), (0, -0.8457466924))
            Line((0, -0.8457466924), (-0.5, -0.8457466924))
        make_face()
    revolve(axis=Axis((-5.7279636534, -5, -4.2836255183), (-0.5, 0, 0.8660254038)), revolution_arc=F13_T52_ANGLE, mode=Mode.SUBTRACT)

    # F13_s53 → F13_t54 (revolve, cut)
    with BuildSketch(Plane(origin=(-6.1508369996, 0, -3.5511873975), x_dir=(0, 1, 0), z_dir=(0.8660254038, 0, 0.5))):
        with BuildLine():
            ThreePointArc((0, 0.3457466924), (-0.1464466094, 0.699300083), (-0.5, 0.8457466924))
            Line((-0.5, 0.8457466924), (0, 0.8457466924))
            Line((0, 0.8457466924), (0, 0.3457466924))
        make_face()
    revolve(axis=Axis((-6.5737103458, -5, -2.8187492767), (-0.5, 0, 0.8660254038)), revolution_arc=F13_T54_ANGLE, mode=Mode.SUBTRACT)

    # F13_s55 → F13_t56 (revolve, cut)
    with BuildSketch(Plane(origin=(6.1508369996, 0, -3.5511873975), x_dir=(0, 1, 0), z_dir=(-0.8660254038, 0, 0.5))):
        with BuildLine():
            ThreePointArc((-0.5, -0.8457466924), (-0.1464466094, -0.699300083), (0, -0.3457466924))
            Line((0, -0.3457466924), (0, -0.8457466924))
            Line((0, -0.8457466924), (-0.5, -0.8457466924))
        make_face()
    revolve(axis=Axis((6.5737103458, -5, -2.8187492767), (-0.5, 0, -0.8660254038)), revolution_arc=F13_T56_ANGLE, mode=Mode.SUBTRACT)


solid = f1_12.part
